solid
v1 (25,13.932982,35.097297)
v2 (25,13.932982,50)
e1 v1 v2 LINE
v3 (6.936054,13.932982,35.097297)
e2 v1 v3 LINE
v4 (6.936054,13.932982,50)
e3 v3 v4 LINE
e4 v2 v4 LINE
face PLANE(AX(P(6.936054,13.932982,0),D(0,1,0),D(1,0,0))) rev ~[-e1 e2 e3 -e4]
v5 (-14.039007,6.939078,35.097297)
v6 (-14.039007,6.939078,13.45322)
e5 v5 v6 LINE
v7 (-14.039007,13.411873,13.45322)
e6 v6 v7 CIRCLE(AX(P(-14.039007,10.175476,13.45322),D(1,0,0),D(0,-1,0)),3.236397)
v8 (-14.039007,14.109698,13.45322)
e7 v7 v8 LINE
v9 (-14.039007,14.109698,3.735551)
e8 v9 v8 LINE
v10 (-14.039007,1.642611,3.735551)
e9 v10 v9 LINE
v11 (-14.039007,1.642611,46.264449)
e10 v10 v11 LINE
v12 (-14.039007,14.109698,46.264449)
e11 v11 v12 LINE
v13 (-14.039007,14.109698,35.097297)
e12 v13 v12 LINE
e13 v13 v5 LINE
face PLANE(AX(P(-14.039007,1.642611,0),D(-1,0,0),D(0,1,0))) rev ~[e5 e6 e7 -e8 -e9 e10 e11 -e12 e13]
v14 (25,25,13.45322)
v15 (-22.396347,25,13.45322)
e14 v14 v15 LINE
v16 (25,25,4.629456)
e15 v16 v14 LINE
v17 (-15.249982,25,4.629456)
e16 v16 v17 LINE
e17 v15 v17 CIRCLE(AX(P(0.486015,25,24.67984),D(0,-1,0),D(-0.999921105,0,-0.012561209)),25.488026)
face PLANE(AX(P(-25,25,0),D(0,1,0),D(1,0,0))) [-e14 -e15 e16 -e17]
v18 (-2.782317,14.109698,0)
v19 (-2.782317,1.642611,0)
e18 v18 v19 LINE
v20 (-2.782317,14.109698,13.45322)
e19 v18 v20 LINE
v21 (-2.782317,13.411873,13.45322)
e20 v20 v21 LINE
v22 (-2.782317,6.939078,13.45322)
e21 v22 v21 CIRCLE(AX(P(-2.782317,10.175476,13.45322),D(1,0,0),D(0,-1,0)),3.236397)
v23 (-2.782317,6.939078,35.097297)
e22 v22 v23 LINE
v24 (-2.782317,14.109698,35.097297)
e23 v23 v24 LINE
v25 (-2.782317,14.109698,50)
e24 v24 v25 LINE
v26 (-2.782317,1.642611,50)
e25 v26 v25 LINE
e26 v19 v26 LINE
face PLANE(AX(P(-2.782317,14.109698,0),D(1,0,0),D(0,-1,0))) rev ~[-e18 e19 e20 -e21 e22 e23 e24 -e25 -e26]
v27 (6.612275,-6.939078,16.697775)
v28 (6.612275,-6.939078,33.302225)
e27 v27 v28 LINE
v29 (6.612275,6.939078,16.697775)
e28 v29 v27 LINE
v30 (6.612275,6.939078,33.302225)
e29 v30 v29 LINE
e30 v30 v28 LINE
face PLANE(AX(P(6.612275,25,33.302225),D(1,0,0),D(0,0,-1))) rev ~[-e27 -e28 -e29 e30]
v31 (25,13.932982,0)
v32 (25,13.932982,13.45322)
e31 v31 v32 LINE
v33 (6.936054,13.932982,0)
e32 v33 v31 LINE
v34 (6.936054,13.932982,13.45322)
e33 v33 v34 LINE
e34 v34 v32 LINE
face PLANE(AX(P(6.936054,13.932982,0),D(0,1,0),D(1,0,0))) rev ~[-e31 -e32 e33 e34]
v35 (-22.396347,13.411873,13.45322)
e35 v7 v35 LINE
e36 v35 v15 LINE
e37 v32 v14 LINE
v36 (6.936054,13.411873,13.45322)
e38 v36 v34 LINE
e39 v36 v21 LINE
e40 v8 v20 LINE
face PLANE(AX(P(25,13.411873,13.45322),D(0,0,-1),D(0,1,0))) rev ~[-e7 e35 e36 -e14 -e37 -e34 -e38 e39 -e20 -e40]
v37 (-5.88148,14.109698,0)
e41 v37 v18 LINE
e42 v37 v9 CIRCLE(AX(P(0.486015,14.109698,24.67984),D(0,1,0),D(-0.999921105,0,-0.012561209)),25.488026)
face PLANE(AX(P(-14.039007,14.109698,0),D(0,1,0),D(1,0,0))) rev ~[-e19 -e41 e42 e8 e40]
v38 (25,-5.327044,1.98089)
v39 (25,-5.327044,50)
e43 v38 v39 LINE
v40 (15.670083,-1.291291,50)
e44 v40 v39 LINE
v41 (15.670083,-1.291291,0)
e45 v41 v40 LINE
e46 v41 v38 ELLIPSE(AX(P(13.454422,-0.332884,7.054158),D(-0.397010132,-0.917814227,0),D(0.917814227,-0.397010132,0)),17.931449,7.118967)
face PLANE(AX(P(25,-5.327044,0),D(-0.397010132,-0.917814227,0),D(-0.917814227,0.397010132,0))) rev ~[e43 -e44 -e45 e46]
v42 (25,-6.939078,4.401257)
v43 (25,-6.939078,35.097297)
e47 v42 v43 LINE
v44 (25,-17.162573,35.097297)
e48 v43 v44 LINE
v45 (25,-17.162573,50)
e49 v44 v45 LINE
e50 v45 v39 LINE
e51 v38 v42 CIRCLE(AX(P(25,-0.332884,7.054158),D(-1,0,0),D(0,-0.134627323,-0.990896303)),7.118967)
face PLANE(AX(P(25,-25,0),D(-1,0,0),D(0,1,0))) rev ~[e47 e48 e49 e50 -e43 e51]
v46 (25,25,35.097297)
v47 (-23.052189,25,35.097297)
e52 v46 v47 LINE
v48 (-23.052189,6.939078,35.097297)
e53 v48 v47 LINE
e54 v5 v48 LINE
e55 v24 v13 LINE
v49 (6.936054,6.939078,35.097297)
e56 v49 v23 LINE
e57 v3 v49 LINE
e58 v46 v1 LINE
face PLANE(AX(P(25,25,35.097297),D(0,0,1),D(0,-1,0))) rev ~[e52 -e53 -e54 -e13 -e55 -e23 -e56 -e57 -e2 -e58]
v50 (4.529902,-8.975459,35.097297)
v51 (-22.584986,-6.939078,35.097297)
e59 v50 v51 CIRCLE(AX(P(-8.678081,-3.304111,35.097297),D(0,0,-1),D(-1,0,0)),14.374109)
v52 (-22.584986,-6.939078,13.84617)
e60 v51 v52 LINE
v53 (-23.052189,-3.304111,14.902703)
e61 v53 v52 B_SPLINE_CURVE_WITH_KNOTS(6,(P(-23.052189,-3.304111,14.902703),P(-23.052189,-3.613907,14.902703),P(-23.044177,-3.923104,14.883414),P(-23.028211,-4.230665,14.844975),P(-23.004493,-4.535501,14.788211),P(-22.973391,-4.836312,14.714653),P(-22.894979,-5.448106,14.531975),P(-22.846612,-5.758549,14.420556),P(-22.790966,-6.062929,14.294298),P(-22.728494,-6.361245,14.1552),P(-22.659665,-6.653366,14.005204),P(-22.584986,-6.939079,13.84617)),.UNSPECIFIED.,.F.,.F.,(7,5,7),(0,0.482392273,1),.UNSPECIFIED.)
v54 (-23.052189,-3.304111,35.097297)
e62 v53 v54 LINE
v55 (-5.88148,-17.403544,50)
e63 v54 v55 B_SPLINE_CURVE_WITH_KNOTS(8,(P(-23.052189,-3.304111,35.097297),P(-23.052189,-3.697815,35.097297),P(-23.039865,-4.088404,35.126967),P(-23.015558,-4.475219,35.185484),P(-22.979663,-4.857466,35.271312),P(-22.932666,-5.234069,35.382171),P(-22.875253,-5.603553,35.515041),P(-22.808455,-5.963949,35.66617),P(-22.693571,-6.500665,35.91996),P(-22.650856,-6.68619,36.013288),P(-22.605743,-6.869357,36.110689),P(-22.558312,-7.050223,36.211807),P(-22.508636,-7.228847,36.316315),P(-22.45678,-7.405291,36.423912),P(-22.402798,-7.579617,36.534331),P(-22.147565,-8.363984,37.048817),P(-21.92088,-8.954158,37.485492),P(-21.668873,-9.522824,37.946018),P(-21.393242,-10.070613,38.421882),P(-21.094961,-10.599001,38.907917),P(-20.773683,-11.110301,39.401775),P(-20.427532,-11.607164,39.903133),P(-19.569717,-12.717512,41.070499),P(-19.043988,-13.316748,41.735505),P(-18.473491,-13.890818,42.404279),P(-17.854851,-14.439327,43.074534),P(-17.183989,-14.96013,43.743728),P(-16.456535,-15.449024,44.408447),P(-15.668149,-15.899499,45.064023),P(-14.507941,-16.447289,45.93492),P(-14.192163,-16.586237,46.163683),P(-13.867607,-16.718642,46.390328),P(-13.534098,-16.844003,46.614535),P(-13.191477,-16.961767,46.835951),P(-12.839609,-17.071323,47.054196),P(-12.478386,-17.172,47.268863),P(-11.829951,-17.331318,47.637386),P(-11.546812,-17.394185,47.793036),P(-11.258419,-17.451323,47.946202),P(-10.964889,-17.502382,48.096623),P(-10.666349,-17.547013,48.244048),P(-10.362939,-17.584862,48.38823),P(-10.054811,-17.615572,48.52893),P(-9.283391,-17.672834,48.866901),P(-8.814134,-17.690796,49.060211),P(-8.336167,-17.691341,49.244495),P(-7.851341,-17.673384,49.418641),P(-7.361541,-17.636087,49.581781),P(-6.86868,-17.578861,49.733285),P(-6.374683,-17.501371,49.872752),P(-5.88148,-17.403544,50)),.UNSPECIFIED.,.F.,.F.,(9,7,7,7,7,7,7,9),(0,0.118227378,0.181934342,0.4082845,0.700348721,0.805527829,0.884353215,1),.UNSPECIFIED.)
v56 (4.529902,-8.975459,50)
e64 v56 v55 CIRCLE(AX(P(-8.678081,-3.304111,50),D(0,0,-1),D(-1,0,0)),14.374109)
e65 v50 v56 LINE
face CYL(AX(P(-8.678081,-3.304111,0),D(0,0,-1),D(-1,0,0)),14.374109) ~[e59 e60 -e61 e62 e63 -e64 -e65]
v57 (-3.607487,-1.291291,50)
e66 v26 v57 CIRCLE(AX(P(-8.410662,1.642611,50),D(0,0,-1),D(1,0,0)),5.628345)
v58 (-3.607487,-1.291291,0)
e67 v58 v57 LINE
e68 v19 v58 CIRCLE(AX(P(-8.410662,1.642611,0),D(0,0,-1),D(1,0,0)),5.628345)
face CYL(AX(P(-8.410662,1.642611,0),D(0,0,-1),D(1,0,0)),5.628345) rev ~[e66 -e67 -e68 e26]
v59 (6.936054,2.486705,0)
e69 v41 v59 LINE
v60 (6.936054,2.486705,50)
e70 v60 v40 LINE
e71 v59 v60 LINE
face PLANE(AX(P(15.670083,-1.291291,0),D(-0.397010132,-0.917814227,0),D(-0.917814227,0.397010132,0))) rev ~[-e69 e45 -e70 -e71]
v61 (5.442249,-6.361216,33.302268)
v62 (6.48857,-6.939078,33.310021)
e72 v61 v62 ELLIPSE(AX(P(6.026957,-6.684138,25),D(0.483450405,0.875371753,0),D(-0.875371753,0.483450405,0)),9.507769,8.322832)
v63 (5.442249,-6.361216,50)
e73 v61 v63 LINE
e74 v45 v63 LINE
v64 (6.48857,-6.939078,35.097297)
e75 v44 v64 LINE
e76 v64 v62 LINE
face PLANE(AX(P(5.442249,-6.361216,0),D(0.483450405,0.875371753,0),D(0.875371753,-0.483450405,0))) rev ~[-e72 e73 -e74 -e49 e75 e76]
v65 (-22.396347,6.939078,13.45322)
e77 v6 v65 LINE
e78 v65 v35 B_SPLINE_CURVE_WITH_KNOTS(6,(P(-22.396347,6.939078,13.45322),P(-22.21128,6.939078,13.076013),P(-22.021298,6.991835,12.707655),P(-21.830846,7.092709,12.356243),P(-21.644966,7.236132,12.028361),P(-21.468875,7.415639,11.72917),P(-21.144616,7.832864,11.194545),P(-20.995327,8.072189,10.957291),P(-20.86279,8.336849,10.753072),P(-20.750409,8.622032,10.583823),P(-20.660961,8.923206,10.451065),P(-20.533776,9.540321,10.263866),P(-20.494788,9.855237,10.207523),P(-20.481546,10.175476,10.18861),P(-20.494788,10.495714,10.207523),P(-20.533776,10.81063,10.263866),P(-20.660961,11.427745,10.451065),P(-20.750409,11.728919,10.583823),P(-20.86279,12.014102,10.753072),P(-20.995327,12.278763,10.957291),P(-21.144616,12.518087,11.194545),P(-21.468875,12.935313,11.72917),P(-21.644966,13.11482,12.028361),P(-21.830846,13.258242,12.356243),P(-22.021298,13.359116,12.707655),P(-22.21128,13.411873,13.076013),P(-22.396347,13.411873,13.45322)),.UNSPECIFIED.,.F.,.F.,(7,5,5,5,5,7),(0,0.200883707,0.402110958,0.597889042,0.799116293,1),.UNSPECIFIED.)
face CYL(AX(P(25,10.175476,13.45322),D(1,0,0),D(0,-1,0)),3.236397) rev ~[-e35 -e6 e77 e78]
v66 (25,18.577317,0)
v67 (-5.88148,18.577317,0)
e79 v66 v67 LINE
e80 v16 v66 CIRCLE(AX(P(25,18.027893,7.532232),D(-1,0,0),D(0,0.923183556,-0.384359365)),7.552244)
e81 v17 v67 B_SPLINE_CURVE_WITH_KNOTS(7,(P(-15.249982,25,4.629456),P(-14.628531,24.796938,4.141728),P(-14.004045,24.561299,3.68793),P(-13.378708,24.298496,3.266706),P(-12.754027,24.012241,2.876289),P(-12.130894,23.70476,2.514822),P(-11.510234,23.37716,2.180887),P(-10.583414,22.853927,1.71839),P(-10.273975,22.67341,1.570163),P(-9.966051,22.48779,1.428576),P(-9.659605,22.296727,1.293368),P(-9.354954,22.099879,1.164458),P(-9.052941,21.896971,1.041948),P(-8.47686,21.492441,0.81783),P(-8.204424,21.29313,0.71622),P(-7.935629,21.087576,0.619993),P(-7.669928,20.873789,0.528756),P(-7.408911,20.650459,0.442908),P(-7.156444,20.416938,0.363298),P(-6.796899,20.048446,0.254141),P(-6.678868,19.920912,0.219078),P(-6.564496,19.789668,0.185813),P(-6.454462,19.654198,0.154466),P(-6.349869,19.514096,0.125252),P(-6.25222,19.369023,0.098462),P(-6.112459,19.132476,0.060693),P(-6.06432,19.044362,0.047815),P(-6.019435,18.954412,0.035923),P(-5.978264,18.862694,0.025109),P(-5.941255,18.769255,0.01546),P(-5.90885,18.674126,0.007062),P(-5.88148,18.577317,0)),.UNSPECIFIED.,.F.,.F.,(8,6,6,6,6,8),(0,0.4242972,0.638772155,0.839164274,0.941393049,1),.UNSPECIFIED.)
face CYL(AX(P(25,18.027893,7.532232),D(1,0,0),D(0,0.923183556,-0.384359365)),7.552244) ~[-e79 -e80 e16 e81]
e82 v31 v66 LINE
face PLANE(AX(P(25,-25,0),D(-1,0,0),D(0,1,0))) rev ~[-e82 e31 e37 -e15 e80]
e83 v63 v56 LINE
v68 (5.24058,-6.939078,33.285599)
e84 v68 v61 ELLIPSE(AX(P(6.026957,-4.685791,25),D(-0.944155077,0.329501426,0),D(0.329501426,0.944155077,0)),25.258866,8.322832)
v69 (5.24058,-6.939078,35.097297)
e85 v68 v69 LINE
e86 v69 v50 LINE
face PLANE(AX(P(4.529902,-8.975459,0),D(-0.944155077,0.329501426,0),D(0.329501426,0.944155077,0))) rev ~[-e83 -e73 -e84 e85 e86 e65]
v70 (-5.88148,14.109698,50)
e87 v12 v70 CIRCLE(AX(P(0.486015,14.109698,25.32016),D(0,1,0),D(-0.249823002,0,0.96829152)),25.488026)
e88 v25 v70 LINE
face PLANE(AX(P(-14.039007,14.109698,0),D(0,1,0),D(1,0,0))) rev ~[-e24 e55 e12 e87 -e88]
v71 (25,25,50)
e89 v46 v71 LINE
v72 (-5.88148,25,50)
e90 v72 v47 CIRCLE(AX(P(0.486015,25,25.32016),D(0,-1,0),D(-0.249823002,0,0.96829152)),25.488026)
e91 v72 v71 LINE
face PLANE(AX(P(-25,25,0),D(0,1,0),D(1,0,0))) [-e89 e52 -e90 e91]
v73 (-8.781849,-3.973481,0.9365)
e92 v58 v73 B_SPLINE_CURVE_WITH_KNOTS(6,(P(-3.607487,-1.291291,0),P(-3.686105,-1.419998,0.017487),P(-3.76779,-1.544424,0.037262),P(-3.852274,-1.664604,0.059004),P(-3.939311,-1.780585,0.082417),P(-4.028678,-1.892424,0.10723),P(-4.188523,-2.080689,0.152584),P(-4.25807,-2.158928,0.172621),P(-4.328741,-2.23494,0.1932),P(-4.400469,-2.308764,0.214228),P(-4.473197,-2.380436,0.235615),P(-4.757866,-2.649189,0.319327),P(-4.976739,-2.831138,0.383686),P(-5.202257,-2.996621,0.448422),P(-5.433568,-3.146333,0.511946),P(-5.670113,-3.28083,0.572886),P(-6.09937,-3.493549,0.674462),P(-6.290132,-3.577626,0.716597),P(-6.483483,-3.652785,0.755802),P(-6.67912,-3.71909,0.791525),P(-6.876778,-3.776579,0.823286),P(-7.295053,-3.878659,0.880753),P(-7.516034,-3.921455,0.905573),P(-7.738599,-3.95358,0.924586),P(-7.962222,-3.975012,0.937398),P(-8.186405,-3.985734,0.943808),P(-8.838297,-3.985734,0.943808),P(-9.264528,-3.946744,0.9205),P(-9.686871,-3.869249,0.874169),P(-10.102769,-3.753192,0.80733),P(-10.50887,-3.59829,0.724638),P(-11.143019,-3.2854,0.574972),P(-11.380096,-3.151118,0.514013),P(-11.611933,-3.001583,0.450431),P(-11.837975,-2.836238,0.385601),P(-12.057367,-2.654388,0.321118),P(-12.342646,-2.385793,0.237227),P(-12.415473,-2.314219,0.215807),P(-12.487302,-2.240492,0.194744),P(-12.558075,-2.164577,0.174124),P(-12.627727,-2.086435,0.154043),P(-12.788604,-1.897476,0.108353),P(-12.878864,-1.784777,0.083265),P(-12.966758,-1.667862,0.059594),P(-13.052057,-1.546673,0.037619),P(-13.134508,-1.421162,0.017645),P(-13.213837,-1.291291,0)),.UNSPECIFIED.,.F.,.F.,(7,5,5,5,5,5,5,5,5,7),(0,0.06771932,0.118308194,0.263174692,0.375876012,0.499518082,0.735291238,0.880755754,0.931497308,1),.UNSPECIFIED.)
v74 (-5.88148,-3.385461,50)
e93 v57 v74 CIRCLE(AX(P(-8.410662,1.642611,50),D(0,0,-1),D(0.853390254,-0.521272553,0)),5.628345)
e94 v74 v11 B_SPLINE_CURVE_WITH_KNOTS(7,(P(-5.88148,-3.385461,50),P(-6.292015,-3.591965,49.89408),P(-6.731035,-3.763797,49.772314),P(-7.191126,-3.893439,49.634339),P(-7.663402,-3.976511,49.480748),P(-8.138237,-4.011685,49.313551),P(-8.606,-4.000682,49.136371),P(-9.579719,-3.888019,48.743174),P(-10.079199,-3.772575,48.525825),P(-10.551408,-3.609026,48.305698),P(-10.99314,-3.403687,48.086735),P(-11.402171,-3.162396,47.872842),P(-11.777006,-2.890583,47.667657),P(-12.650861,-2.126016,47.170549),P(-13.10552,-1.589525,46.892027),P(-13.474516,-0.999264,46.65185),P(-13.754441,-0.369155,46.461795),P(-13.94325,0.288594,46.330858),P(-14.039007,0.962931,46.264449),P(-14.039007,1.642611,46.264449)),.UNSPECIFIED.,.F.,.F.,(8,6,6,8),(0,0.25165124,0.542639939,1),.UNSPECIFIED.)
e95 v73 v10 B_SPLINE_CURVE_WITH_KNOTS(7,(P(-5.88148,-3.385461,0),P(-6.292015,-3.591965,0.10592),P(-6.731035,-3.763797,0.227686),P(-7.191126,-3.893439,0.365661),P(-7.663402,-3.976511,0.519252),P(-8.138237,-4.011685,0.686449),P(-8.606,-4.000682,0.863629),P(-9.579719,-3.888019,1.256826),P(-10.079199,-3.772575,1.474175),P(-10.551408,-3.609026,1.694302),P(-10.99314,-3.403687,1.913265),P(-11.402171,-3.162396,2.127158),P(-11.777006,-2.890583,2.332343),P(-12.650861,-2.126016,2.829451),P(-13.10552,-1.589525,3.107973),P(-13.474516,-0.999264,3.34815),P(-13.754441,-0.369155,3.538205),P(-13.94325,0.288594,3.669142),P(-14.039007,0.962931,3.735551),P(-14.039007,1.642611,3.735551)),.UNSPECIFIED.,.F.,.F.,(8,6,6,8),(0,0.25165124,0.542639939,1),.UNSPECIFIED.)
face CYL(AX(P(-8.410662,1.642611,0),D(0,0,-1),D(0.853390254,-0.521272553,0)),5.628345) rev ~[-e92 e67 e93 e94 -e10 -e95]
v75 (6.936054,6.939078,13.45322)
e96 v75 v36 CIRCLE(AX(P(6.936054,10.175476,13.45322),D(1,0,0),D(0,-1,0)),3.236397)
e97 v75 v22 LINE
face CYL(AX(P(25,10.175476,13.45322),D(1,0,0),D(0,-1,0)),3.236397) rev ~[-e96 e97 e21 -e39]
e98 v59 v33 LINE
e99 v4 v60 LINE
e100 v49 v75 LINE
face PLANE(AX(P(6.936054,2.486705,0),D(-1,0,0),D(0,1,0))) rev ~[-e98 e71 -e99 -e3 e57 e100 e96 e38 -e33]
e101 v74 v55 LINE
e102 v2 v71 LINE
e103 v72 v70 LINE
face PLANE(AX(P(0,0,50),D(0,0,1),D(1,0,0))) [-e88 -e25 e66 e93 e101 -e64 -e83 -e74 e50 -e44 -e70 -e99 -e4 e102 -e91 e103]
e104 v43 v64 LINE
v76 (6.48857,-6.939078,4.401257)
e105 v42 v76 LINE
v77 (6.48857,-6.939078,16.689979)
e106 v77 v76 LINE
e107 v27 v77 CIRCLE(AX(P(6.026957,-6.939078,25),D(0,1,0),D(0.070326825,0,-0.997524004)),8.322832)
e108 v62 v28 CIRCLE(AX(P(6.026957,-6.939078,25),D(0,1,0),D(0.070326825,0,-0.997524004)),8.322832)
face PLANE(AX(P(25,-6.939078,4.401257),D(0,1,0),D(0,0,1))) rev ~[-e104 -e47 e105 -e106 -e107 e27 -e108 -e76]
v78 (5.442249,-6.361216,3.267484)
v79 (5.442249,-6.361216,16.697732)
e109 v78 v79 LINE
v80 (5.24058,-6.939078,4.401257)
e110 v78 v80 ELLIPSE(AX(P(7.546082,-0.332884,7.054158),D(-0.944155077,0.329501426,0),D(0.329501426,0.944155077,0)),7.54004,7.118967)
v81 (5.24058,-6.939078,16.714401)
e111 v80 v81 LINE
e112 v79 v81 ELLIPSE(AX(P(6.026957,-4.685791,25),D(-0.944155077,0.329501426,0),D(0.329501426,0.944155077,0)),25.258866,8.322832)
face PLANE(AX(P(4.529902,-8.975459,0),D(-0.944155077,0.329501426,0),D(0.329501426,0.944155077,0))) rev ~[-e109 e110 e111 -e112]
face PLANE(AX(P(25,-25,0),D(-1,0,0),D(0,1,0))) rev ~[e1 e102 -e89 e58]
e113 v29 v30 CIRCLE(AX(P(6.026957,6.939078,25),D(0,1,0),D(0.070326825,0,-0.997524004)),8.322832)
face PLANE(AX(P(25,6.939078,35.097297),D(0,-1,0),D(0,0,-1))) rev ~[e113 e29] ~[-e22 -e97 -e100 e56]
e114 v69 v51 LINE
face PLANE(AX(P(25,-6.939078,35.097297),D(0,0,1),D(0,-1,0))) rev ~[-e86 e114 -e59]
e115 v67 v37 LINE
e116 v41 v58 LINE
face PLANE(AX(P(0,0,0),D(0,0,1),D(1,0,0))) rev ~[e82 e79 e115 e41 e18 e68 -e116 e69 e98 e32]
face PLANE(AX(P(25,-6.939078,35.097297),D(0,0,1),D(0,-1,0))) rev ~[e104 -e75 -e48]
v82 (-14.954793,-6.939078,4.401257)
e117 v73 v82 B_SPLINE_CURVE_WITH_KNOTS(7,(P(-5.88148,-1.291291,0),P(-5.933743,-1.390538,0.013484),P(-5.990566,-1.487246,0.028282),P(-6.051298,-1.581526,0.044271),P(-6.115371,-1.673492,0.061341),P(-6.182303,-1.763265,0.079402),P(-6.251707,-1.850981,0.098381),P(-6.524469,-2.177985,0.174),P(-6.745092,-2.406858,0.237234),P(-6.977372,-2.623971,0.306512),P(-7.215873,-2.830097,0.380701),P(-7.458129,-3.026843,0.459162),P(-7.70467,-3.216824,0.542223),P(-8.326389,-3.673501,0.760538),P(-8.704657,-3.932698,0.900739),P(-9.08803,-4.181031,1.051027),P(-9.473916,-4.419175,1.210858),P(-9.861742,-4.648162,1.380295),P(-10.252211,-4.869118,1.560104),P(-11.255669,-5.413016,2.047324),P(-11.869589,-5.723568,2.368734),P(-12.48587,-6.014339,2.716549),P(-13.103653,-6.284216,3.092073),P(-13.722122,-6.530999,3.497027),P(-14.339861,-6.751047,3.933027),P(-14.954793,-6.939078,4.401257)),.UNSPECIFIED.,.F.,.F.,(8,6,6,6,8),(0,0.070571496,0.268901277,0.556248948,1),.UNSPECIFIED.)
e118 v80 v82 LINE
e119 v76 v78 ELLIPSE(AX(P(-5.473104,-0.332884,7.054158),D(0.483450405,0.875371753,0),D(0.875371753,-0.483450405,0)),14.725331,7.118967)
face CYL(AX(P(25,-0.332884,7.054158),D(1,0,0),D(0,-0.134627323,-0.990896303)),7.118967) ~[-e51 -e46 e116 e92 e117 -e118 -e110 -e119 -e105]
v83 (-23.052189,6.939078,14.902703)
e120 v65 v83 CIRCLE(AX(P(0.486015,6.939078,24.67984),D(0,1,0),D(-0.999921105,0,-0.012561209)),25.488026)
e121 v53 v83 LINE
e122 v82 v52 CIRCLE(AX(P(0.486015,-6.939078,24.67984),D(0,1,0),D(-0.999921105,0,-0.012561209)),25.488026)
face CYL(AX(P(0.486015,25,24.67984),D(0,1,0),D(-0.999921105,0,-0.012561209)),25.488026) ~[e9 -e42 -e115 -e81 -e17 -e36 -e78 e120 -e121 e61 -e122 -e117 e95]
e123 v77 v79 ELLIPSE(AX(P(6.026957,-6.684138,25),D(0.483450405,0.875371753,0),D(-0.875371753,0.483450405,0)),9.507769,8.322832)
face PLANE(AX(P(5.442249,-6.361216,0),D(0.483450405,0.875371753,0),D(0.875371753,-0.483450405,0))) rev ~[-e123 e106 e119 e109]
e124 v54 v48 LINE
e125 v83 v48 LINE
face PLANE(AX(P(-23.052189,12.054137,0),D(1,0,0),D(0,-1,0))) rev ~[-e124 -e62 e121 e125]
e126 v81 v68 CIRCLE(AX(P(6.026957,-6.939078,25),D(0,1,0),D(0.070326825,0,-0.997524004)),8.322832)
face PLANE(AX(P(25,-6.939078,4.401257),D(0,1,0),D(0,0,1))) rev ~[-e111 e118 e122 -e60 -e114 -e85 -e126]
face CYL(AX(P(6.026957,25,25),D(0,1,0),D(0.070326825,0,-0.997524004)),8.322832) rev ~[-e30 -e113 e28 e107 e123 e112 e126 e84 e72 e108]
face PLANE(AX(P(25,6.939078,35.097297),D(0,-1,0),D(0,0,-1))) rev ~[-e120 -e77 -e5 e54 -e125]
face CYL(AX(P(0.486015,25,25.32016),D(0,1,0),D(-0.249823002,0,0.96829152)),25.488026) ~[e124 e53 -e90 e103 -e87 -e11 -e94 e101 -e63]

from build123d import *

# Parameters (mm, degrees)
F0_W     = 50
F0_H     = 50
F1_DEPTH = 50
F3_DEPTH = 50.001
F5_DEPTH = 50.001
F7_DEPTH = 50.001


# Not quite as in the source:
# - a feature names something its author has since deleted; it is built from what else it names


with BuildPart() as f1:
    # F0 (on Top) → F1 (new body)
    with BuildSketch(Plane.XY):
        Rectangle(F0_W, F0_H)
    extrude(amount=F1_DEPTH)

    # F2 (on face) → F3 (cut, through all)
    with BuildSketch(Plane(origin=(0, 25, 0), x_dir=(-1, 0, 0), z_dir=(0, 1, 0))):
        with BuildLine():
            ThreePointArc((-6.6122752614, 16.6977748275), (2.2958755953, 25), (-6.6122752614, 33.3022251725))
            Line((-6.6122752614, 33.3022251725), (-6.6122752614, 16.6977748275))
        make_face()
        with BuildLine():
            ThreePointArc((5.8814799413, 50), (19.5641723767, 41.0564068722), (25, 25.640320846))
            Line((25, 25.640320846), (25, 50))
            Line((25, 50), (5.8814799413, 50))
        make_face()
        with BuildLine():
            Line((25, 0), (25, 24.359679154))
            ThreePointArc((25, 24.359679154), (19.5641723767, 8.9435931278), (5.8814799413, 0))
            Line((5.8814799413, 0), (25, 0))
        make_face()
    extrude(amount=-F3_DEPTH, mode=Mode.SUBTRACT)

    # F4 (on face) → F5 (cut, through all)
    with BuildSketch(Plane.YZ.offset(25)):
        Polygon((-6.9390782155, 35.097297281), (-25, 35.097297281), (-25, 0), (-6.9390782155, 0), (-6.9390782155, 4.401256796), (-6.9390782155, 13.4532200173), align=None)
        with BuildLine():
            Line((25, 13.4532200173), (25, 35.097297281))
            Line((25, 35.097297281), (6.9390782155, 35.097297281))
            Line((6.9390782155, 35.097297281), (6.9390782155, 13.4532200173))
            ThreePointArc((6.9390782155, 13.4532200173), (10.1754756179, 10.2168226149), (13.4118730202, 13.4532200173))
            Line((13.4118730202, 13.4532200173), (25, 13.4532200173))
        make_face()
        with BuildLine():
            Line((25, 0), (25, 4.6294564381))
            ThreePointArc((25, 4.6294564381), (22.4439231862, 1.4056456338), (18.5773167759, 0))
            Line((18.5773167759, 0), (25, 0))
        make_face()
        with BuildLine():
            Line((-6.9390782155, 4.401256796), (-6.9390782155, 0))
            Line((-6.9390782155, 0), (-1.2912911565, 0))
            ThreePointArc((-1.2912911565, 0), (-4.7087911569, 1.438899851), (-6.9390782155, 4.401256796))
        make_face()
    extrude(amount=-F5_DEPTH, mode=Mode.SUBTRACT)

    # F6 (on face) → F7 (cut, through all)
    with BuildSketch(Plane(origin=(0, 0, 0), x_dir=(1, 0, 0), z_dir=(0, 0, -1))):
        Polygon((-27.4569652975, -12.0541369542), (-23.0521892468, -12.0541369542), (-23.0521892468, 3.30411084), (-23.0521892468, 9.0968515724), (-27.4569652975, 9.0968515724), align=None)
        Polygon((6.9360537454, -13.9329824597), (25, -13.9329824597), (25, 1.2912911565), (15.6700833973, 1.2912911565), (6.9360537454, -2.4867046159), align=None)
        with BuildLine():
            Line((-23.0521892468, 9.0968515724), (-23.0521892468, 3.30411084))
            ThreePointArc((-23.0521892468, 3.30411084), (-11.5730780457, 17.3836701729), (4.5299022458, 8.9754592627))
            Line((4.5299022458, 8.9754592627), (5.442249123, 6.361215841))
            Line((5.442249123, 6.361215841), (25, 17.1625725925))
            Line((25, 17.1625725925), (25, 25))
            Line((25, 25), (-23.0521892468, 25))
            Line((-23.0521892468, 25), (-23.0521892468, 9.0968515724))
        make_face()
        Polygon((15.6700833973, 1.2912911565), (25, 1.2912911565), (25, 5.3270440549), align=None)
        with BuildLine():
            Line((-5.8814799413, 1.2912911565), (-5.8814799413, -14.1096981242))
            Line((-5.8814799413, -14.1096981242), (-2.7823168784, -14.1096981242))
            Line((-2.7823168784, -14.1096981242), (-2.7823168784, -1.6426106449))
            ThreePointArc((-2.7823168784, -1.6426106449), (-2.9925352611, -0.1187433848), (-3.6074871188, 1.2912911565))
            Line((-3.6074871188, 1.2912911565), (-5.8814799413, 1.2912911565))
        make_face()
        with BuildLine():
            Line((-14.0390070155, -14.1096981242), (-5.8814799413, -14.1096981242))
            Line((-5.8814799413, -14.1096981242), (-5.8814799413, 1.2912911565))
            Line((-5.8814799413, 1.2912911565), (-3.6074871188, 1.2912911565))
            ThreePointArc((-3.6074871188, 1.2912911565), (-9.9345292071, 3.7755160409), (-14.0390070155, -1.6426106449))
            Line((-14.0390070155, -1.6426106449), (-14.0390070155, -14.1096981242))
        make_face()
    extrude(amount=-F7_DEPTH, mode=Mode.SUBTRACT)


solid = f1.part
